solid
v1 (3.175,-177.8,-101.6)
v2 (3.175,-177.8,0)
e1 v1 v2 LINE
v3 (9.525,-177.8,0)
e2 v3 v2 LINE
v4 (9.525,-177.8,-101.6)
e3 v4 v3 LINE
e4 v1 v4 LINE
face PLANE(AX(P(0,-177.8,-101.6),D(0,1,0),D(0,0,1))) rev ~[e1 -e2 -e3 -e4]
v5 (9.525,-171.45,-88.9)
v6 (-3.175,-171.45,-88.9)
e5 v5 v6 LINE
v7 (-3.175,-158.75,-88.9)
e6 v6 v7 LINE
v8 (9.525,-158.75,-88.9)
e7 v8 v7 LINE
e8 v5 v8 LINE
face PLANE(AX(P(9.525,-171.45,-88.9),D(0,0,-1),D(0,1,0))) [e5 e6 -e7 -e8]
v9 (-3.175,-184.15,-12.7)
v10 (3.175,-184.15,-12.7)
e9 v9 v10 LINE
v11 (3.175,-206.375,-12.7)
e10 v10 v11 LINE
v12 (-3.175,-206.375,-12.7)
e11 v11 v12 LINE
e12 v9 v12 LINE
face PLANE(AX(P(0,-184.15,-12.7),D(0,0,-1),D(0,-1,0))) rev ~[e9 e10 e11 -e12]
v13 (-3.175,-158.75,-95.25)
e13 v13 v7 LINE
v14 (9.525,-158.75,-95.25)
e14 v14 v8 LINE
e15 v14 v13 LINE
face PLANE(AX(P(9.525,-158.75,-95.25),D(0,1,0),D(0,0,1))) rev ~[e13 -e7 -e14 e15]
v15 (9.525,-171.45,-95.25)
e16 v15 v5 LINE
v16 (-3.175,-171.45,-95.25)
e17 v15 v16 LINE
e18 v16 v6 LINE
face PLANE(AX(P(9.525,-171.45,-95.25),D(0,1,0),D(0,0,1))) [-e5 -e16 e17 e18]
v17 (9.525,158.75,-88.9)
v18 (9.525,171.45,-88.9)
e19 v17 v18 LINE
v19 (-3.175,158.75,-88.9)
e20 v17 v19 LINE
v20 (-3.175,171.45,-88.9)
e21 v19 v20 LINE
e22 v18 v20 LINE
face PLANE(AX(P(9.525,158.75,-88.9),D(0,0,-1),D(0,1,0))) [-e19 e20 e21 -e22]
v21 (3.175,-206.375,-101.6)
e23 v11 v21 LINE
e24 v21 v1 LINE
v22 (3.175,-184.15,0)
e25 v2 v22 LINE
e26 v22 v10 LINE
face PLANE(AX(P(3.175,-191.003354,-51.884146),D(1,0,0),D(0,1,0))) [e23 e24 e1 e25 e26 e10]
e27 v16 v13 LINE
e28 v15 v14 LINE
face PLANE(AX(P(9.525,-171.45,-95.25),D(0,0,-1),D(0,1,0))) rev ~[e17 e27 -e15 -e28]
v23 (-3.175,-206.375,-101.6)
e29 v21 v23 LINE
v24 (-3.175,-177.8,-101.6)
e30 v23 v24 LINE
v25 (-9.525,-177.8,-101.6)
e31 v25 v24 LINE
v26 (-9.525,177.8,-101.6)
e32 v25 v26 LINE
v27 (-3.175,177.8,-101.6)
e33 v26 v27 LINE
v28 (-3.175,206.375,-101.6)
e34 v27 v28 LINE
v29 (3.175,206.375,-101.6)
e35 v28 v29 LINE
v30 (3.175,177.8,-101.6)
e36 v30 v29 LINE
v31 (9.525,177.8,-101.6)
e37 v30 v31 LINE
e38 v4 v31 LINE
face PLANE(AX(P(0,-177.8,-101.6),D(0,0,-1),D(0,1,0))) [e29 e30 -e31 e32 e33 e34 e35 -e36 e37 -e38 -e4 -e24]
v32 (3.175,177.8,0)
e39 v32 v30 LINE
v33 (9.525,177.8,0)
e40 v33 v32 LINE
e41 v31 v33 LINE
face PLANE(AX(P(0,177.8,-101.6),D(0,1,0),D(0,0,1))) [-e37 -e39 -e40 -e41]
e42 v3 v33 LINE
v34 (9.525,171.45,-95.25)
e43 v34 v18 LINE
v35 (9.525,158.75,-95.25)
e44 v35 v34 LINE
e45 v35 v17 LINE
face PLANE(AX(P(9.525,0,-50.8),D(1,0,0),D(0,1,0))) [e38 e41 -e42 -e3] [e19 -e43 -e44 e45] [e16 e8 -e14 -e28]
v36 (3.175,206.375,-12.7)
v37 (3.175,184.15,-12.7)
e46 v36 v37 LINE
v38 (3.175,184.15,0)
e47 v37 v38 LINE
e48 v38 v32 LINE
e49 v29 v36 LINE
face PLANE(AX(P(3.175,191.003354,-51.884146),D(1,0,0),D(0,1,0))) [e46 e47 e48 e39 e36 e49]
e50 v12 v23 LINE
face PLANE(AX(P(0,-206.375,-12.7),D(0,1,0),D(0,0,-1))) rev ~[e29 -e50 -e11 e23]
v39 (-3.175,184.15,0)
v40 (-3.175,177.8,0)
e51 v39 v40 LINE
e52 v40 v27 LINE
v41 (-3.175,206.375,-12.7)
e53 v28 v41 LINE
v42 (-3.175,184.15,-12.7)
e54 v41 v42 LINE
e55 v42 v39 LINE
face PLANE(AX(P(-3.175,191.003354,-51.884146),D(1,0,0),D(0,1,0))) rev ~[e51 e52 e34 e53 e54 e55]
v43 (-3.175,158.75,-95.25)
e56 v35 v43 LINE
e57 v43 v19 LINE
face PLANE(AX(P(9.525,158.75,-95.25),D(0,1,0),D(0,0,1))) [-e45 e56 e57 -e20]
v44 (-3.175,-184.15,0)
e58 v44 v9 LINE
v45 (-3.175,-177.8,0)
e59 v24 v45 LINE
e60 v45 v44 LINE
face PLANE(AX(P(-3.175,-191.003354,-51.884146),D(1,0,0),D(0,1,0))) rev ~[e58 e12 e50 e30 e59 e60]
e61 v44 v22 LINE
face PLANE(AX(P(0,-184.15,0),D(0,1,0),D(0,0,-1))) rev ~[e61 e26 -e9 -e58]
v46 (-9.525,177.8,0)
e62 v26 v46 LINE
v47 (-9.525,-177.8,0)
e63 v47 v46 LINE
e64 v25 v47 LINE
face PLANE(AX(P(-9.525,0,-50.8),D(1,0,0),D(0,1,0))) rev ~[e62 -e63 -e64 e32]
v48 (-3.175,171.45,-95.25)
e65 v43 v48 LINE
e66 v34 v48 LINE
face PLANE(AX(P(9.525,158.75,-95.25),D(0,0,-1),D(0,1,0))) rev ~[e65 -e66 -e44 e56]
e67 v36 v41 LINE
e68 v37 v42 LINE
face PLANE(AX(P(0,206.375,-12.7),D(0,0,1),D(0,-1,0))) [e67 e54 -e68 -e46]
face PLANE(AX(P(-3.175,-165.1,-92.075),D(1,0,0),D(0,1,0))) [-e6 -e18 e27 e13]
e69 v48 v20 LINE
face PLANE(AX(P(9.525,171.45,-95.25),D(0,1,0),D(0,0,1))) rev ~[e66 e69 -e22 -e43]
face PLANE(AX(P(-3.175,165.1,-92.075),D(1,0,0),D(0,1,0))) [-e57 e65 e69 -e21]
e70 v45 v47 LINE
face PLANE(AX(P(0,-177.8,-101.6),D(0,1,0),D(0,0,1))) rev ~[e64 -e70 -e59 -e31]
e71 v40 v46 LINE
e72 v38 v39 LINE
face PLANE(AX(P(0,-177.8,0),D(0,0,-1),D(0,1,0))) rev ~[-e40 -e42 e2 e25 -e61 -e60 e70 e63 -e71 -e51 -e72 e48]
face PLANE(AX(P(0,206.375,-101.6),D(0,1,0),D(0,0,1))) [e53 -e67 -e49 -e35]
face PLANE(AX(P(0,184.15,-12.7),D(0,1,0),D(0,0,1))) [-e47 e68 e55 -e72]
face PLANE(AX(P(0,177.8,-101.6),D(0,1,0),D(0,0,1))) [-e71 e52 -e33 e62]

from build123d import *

# Parameters (mm, degrees)
F0_W     = 355.6
F0_H     = 101.6
F1_DEPTH = 9.525
F2_DEPTH = 3.175
F3_W     = 12.7
F3_H     = 6.35
F4_DEPTH = 12.7


# Not quite as in the source:
# - a feature names something its author has since deleted; it is built from what else it names


with BuildPart() as f1:
    # F0 (on Right) → F1 (new body, symmetric)
    with BuildSketch(Plane.YZ):
        with Locations((0, -50.8)):
            Rectangle(F0_W, F0_H)
    extrude(amount=F1_DEPTH, both=True)

    # F0 (on Right) → F2 (join, symmetric)
    with BuildSketch(Plane.YZ):
        Polygon((-177.8, -101.6), (-177.8, 0), (-184.15, 0), (-184.15, -12.7), (-206.375, -12.7), (-206.375, -101.6), align=None)
        Polygon((184.15, 0), (177.8, 0), (177.8, -101.6), (206.375, -101.6), (206.375, -12.7), (184.15, -12.7), align=None)
    extrude(amount=F2_DEPTH, both=True)

    # F3 (on face) → F4 (cut)
    with BuildSketch(Plane.YZ.offset(9.525)):
        with Locations((-165.1, -92.075)):
            Rectangle(F3_W, F3_H)
        with Locations((165.1, -92.075)):
            Rectangle(F3_W, F3_H)
    extrude(amount=-F4_DEPTH, mode=Mode.SUBTRACT)


solid = f1.part
